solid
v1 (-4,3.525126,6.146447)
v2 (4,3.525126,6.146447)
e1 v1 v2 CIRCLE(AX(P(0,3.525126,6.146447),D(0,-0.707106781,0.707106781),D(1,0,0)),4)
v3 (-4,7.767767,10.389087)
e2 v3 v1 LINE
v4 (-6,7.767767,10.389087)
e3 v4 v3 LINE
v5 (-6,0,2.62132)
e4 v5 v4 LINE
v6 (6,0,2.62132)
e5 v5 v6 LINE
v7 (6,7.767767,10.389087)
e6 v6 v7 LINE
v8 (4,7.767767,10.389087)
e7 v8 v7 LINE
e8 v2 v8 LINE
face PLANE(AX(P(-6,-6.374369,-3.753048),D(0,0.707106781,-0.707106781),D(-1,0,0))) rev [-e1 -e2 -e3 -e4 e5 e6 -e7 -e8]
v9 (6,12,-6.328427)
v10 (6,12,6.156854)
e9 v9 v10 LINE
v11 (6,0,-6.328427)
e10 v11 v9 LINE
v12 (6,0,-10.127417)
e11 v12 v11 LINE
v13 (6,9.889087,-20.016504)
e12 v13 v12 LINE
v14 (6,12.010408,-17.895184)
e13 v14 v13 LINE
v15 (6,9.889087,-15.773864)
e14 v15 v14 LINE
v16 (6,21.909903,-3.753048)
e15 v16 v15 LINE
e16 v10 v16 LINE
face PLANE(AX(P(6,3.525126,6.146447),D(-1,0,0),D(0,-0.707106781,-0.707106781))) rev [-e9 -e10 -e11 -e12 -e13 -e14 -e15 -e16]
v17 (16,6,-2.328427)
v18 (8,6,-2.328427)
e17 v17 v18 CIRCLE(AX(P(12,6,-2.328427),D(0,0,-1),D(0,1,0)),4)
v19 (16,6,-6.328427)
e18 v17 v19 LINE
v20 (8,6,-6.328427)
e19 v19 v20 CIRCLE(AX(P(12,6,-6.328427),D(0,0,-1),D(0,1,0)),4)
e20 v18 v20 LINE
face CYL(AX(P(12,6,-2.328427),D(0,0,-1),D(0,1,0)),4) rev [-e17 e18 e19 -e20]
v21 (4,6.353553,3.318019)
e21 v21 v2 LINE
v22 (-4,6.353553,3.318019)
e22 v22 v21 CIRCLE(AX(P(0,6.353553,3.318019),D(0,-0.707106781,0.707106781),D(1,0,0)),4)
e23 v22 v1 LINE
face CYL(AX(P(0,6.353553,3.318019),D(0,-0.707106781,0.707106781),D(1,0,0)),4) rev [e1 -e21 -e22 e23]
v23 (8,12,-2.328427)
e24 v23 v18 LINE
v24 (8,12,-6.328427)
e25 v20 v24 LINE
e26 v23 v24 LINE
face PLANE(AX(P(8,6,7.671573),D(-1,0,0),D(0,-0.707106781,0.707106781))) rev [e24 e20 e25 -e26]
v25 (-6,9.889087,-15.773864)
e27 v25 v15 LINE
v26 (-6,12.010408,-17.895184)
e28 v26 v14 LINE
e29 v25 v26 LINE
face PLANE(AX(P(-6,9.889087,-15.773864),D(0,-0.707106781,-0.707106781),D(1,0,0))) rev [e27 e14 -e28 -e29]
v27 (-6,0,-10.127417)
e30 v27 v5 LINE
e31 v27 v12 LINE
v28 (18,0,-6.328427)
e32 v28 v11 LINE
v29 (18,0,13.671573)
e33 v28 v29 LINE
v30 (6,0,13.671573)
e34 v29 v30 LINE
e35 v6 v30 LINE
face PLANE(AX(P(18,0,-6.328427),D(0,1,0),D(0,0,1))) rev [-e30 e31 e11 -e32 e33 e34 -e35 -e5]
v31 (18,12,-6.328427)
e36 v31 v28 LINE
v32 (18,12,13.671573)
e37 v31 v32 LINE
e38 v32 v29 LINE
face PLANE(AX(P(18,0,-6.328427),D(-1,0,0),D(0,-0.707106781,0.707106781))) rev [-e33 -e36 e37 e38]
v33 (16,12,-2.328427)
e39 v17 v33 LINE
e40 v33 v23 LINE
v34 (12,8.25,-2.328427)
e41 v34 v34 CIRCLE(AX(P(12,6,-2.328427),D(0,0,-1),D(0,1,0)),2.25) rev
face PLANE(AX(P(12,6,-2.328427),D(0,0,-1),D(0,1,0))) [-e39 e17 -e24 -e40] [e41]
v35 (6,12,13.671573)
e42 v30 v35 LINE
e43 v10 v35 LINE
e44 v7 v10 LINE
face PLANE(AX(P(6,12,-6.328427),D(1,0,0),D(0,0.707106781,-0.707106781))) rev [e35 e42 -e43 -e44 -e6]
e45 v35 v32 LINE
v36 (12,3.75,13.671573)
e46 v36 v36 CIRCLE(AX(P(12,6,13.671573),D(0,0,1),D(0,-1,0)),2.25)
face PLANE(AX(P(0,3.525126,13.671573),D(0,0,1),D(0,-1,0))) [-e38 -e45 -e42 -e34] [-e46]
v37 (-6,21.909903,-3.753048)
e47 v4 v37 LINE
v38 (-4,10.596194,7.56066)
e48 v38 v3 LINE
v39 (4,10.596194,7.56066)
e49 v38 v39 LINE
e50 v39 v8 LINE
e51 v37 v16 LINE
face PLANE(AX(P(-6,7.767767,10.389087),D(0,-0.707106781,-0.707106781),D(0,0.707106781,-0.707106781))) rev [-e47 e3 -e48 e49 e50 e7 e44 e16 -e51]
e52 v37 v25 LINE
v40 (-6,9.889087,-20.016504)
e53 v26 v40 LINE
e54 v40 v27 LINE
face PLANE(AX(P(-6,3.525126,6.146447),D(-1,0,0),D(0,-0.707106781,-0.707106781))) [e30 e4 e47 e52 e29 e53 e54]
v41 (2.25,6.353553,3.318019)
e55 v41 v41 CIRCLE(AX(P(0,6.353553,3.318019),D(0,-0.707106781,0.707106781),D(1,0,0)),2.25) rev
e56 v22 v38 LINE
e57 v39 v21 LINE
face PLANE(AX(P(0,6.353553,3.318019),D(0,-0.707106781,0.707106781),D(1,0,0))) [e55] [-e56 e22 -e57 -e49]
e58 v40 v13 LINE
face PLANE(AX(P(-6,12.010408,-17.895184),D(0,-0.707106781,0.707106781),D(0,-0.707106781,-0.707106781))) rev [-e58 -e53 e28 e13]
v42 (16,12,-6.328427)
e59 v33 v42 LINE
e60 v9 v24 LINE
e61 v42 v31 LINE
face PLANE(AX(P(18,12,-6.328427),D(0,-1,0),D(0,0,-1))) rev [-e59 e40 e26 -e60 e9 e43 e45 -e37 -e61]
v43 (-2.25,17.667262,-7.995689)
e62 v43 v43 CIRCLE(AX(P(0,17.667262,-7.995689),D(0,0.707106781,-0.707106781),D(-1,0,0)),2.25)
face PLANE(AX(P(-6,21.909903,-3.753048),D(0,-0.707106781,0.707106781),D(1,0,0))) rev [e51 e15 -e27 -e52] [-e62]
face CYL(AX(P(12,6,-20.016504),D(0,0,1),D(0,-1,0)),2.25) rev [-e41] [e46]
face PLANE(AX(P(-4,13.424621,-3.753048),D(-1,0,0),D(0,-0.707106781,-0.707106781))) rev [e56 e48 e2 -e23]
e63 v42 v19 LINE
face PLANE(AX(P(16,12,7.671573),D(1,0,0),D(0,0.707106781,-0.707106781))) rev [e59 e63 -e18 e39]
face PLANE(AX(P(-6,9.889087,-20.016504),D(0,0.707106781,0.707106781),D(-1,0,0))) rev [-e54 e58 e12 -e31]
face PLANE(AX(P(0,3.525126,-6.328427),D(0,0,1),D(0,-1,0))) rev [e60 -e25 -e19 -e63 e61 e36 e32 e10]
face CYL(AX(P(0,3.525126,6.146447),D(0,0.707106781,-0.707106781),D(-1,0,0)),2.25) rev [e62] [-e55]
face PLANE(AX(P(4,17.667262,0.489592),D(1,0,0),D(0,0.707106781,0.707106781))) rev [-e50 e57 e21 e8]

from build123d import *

# Parameters (mm, degrees)
FRAME_BODY_EXT_DEPTH                  = 6
FRAME_BODY_EXT_DEPTH_BACK             = 6
SKETCH6_R                             = 2.25
FRAME_BOLT_CUT_DEPTH                  = 26.13961018
SKETCH9_W                             = 12
SKETCH9_H                             = 12
CASE_BODY_EXT_DEPTH                   = 20
SKETCH10_R                            = 2.25
CASE_BOLT_CUT_DEPTH                   = 39.721912961
PRINT_PLANE_CUT_REACH                 = 31.479
SKETCH11_R                            = 4
CASE_COUNTERBORE_CUT_DEPTH            = 4
SKETCH7_R                             = 4
FRAME_COUNTERBORE_CUT_DEPTH           = 4
FRAME_COUNTERBORE_EXTENSION_CUT_DEPTH = 4
CASE_COUNTERBORE_EXTENSION_CUT_DEPTH  = 4
ROTATION_ONTO_PRINT_PLANE_ANGLE       = 45


with BuildPart() as part:
    # Sketch5 → Frame Body Ext (new, two sides: drawn at the far end of the back side and taken through both)
    with BuildSketch(Plane.ZY.offset(-FRAME_BODY_EXT_DEPTH_BACK)):
        Polygon((-20, 6), (-20, -11), (-23, -11), (-23, -14), (0, -14), (0, 6), align=None)
    extrude(amount=FRAME_BODY_EXT_DEPTH + FRAME_BODY_EXT_DEPTH_BACK)

    # Sketch6 → Frame Bolt Cut (cut, through all)
    with BuildSketch(Plane(origin=(0, 0, -20), x_dir=(-1, 0, 0), z_dir=(0, 0, -1))):
        Circle(SKETCH6_R)
    extrude(amount=-FRAME_BOLT_CUT_DEPTH, mode=Mode.SUBTRACT)

    # Sketch9 → Case Body Ext (add)
    with BuildSketch(Plane(origin=(12, 7.071067812, 3.571067812), x_dir=(-1, 0, 0), z_dir=(0, -0.7071067811865486, -0.7071067811865465))):
        Rectangle(SKETCH9_W, SKETCH9_H)
    extrude(amount=CASE_BODY_EXT_DEPTH)

    # Sketch10 → Case Bolt Cut (cut, through all)
    with BuildSketch(Plane(origin=(0, 5.321067812, 5.321067812), x_dir=(1, 0, 0), z_dir=(0, 0.7071067811865487, 0.7071067811865465))):
        with Locations(Location((12, 2.474873734, 0), (0, 0, 270))):
            Circle(SKETCH10_R)
    extrude(amount=-CASE_BOLT_CUT_DEPTH, mode=Mode.SUBTRACT)

    # Sketch14 → Print Plane Cut (cut, up to next)
    with BuildSketch(Plane(origin=(6, 0, 0), x_dir=(0, 0, -1), z_dir=(1, 0, 0)), mode=Mode.PRIVATE) as print_plane_cut_sk1:
        Polygon((0, -4.985281374), (9.014718626, -14), (0, -14), align=None)
    print_plane_cut_tool1 = extrude(print_plane_cut_sk1.sketch, amount=-PRINT_PLANE_CUT_REACH, mode=Mode.PRIVATE) & part.part
    add(print_plane_cut_tool1.solids().sort_by_distance((6, -10.995094, -3.004906))[0], mode=Mode.SUBTRACT)

    # Sketch11 → Case Counterbore Cut (cut)
    with BuildSketch(Plane(origin=(0, -8.821067812, -8.821067812), x_dir=(1, 0, 0), z_dir=(0, -0.7071067811865487, -0.7071067811865465))):
        with Locations(Location((12, -2.474873734, 0), (0, 0, 270))):
            Circle(SKETCH11_R)
    extrude(amount=-CASE_COUNTERBORE_CUT_DEPTH, mode=Mode.SUBTRACT)

    # Sketch7 → Frame Counterbore Cut (cut)
    with BuildSketch(Plane.XY):
        Circle(SKETCH7_R)
    extrude(amount=-FRAME_COUNTERBORE_CUT_DEPTH, mode=Mode.SUBTRACT)

    # Sketch15 → Frame Counterbore Extension Cut (cut)
    with BuildSketch(Plane.XY):
        with BuildLine():
            Line((-4, 0), (-4, 6))
            Line((-4, 6), (4, 6))
            Line((4, 6), (4, 0))
            ThreePointArc((4, 0), (0, 4), (-4, 0))
        make_face()
    extrude(amount=-FRAME_COUNTERBORE_EXTENSION_CUT_DEPTH, mode=Mode.SUBTRACT)

    # Sketch16 → Case Counterbore Extension Cut (cut)
    with BuildSketch(Plane(origin=(0, -8.821067812, -8.821067812), x_dir=(1, 0, 0), z_dir=(0, -0.7071067811865486, -0.7071067811865465))):
        with BuildLine():
            Line((16, -8.474873734), (16, -2.474873734))
            ThreePointArc((16, -2.474873734), (12, -6.474873734), (8, -2.474873734))
            Line((8, -2.474873734), (8, -8.474873734))
            Line((8, -8.474873734), (16, -8.474873734))
        make_face()
    extrude(amount=-CASE_COUNTERBORE_EXTENSION_CUT_DEPTH, mode=Mode.SUBTRACT)


with BuildPart() as part_1:
    # Rotation onto Print Plane: read off the stored shape, not the designer's step
    # Rotation onto Print Plane: moved
    add(part.part.moved(Location((0, 6.8388348, 1.8535534))).rotate(Axis((0, 0, 0), (1, 0, 0)), ROTATION_ONTO_PRINT_PLANE_ANGLE))


solid = part_1.part
